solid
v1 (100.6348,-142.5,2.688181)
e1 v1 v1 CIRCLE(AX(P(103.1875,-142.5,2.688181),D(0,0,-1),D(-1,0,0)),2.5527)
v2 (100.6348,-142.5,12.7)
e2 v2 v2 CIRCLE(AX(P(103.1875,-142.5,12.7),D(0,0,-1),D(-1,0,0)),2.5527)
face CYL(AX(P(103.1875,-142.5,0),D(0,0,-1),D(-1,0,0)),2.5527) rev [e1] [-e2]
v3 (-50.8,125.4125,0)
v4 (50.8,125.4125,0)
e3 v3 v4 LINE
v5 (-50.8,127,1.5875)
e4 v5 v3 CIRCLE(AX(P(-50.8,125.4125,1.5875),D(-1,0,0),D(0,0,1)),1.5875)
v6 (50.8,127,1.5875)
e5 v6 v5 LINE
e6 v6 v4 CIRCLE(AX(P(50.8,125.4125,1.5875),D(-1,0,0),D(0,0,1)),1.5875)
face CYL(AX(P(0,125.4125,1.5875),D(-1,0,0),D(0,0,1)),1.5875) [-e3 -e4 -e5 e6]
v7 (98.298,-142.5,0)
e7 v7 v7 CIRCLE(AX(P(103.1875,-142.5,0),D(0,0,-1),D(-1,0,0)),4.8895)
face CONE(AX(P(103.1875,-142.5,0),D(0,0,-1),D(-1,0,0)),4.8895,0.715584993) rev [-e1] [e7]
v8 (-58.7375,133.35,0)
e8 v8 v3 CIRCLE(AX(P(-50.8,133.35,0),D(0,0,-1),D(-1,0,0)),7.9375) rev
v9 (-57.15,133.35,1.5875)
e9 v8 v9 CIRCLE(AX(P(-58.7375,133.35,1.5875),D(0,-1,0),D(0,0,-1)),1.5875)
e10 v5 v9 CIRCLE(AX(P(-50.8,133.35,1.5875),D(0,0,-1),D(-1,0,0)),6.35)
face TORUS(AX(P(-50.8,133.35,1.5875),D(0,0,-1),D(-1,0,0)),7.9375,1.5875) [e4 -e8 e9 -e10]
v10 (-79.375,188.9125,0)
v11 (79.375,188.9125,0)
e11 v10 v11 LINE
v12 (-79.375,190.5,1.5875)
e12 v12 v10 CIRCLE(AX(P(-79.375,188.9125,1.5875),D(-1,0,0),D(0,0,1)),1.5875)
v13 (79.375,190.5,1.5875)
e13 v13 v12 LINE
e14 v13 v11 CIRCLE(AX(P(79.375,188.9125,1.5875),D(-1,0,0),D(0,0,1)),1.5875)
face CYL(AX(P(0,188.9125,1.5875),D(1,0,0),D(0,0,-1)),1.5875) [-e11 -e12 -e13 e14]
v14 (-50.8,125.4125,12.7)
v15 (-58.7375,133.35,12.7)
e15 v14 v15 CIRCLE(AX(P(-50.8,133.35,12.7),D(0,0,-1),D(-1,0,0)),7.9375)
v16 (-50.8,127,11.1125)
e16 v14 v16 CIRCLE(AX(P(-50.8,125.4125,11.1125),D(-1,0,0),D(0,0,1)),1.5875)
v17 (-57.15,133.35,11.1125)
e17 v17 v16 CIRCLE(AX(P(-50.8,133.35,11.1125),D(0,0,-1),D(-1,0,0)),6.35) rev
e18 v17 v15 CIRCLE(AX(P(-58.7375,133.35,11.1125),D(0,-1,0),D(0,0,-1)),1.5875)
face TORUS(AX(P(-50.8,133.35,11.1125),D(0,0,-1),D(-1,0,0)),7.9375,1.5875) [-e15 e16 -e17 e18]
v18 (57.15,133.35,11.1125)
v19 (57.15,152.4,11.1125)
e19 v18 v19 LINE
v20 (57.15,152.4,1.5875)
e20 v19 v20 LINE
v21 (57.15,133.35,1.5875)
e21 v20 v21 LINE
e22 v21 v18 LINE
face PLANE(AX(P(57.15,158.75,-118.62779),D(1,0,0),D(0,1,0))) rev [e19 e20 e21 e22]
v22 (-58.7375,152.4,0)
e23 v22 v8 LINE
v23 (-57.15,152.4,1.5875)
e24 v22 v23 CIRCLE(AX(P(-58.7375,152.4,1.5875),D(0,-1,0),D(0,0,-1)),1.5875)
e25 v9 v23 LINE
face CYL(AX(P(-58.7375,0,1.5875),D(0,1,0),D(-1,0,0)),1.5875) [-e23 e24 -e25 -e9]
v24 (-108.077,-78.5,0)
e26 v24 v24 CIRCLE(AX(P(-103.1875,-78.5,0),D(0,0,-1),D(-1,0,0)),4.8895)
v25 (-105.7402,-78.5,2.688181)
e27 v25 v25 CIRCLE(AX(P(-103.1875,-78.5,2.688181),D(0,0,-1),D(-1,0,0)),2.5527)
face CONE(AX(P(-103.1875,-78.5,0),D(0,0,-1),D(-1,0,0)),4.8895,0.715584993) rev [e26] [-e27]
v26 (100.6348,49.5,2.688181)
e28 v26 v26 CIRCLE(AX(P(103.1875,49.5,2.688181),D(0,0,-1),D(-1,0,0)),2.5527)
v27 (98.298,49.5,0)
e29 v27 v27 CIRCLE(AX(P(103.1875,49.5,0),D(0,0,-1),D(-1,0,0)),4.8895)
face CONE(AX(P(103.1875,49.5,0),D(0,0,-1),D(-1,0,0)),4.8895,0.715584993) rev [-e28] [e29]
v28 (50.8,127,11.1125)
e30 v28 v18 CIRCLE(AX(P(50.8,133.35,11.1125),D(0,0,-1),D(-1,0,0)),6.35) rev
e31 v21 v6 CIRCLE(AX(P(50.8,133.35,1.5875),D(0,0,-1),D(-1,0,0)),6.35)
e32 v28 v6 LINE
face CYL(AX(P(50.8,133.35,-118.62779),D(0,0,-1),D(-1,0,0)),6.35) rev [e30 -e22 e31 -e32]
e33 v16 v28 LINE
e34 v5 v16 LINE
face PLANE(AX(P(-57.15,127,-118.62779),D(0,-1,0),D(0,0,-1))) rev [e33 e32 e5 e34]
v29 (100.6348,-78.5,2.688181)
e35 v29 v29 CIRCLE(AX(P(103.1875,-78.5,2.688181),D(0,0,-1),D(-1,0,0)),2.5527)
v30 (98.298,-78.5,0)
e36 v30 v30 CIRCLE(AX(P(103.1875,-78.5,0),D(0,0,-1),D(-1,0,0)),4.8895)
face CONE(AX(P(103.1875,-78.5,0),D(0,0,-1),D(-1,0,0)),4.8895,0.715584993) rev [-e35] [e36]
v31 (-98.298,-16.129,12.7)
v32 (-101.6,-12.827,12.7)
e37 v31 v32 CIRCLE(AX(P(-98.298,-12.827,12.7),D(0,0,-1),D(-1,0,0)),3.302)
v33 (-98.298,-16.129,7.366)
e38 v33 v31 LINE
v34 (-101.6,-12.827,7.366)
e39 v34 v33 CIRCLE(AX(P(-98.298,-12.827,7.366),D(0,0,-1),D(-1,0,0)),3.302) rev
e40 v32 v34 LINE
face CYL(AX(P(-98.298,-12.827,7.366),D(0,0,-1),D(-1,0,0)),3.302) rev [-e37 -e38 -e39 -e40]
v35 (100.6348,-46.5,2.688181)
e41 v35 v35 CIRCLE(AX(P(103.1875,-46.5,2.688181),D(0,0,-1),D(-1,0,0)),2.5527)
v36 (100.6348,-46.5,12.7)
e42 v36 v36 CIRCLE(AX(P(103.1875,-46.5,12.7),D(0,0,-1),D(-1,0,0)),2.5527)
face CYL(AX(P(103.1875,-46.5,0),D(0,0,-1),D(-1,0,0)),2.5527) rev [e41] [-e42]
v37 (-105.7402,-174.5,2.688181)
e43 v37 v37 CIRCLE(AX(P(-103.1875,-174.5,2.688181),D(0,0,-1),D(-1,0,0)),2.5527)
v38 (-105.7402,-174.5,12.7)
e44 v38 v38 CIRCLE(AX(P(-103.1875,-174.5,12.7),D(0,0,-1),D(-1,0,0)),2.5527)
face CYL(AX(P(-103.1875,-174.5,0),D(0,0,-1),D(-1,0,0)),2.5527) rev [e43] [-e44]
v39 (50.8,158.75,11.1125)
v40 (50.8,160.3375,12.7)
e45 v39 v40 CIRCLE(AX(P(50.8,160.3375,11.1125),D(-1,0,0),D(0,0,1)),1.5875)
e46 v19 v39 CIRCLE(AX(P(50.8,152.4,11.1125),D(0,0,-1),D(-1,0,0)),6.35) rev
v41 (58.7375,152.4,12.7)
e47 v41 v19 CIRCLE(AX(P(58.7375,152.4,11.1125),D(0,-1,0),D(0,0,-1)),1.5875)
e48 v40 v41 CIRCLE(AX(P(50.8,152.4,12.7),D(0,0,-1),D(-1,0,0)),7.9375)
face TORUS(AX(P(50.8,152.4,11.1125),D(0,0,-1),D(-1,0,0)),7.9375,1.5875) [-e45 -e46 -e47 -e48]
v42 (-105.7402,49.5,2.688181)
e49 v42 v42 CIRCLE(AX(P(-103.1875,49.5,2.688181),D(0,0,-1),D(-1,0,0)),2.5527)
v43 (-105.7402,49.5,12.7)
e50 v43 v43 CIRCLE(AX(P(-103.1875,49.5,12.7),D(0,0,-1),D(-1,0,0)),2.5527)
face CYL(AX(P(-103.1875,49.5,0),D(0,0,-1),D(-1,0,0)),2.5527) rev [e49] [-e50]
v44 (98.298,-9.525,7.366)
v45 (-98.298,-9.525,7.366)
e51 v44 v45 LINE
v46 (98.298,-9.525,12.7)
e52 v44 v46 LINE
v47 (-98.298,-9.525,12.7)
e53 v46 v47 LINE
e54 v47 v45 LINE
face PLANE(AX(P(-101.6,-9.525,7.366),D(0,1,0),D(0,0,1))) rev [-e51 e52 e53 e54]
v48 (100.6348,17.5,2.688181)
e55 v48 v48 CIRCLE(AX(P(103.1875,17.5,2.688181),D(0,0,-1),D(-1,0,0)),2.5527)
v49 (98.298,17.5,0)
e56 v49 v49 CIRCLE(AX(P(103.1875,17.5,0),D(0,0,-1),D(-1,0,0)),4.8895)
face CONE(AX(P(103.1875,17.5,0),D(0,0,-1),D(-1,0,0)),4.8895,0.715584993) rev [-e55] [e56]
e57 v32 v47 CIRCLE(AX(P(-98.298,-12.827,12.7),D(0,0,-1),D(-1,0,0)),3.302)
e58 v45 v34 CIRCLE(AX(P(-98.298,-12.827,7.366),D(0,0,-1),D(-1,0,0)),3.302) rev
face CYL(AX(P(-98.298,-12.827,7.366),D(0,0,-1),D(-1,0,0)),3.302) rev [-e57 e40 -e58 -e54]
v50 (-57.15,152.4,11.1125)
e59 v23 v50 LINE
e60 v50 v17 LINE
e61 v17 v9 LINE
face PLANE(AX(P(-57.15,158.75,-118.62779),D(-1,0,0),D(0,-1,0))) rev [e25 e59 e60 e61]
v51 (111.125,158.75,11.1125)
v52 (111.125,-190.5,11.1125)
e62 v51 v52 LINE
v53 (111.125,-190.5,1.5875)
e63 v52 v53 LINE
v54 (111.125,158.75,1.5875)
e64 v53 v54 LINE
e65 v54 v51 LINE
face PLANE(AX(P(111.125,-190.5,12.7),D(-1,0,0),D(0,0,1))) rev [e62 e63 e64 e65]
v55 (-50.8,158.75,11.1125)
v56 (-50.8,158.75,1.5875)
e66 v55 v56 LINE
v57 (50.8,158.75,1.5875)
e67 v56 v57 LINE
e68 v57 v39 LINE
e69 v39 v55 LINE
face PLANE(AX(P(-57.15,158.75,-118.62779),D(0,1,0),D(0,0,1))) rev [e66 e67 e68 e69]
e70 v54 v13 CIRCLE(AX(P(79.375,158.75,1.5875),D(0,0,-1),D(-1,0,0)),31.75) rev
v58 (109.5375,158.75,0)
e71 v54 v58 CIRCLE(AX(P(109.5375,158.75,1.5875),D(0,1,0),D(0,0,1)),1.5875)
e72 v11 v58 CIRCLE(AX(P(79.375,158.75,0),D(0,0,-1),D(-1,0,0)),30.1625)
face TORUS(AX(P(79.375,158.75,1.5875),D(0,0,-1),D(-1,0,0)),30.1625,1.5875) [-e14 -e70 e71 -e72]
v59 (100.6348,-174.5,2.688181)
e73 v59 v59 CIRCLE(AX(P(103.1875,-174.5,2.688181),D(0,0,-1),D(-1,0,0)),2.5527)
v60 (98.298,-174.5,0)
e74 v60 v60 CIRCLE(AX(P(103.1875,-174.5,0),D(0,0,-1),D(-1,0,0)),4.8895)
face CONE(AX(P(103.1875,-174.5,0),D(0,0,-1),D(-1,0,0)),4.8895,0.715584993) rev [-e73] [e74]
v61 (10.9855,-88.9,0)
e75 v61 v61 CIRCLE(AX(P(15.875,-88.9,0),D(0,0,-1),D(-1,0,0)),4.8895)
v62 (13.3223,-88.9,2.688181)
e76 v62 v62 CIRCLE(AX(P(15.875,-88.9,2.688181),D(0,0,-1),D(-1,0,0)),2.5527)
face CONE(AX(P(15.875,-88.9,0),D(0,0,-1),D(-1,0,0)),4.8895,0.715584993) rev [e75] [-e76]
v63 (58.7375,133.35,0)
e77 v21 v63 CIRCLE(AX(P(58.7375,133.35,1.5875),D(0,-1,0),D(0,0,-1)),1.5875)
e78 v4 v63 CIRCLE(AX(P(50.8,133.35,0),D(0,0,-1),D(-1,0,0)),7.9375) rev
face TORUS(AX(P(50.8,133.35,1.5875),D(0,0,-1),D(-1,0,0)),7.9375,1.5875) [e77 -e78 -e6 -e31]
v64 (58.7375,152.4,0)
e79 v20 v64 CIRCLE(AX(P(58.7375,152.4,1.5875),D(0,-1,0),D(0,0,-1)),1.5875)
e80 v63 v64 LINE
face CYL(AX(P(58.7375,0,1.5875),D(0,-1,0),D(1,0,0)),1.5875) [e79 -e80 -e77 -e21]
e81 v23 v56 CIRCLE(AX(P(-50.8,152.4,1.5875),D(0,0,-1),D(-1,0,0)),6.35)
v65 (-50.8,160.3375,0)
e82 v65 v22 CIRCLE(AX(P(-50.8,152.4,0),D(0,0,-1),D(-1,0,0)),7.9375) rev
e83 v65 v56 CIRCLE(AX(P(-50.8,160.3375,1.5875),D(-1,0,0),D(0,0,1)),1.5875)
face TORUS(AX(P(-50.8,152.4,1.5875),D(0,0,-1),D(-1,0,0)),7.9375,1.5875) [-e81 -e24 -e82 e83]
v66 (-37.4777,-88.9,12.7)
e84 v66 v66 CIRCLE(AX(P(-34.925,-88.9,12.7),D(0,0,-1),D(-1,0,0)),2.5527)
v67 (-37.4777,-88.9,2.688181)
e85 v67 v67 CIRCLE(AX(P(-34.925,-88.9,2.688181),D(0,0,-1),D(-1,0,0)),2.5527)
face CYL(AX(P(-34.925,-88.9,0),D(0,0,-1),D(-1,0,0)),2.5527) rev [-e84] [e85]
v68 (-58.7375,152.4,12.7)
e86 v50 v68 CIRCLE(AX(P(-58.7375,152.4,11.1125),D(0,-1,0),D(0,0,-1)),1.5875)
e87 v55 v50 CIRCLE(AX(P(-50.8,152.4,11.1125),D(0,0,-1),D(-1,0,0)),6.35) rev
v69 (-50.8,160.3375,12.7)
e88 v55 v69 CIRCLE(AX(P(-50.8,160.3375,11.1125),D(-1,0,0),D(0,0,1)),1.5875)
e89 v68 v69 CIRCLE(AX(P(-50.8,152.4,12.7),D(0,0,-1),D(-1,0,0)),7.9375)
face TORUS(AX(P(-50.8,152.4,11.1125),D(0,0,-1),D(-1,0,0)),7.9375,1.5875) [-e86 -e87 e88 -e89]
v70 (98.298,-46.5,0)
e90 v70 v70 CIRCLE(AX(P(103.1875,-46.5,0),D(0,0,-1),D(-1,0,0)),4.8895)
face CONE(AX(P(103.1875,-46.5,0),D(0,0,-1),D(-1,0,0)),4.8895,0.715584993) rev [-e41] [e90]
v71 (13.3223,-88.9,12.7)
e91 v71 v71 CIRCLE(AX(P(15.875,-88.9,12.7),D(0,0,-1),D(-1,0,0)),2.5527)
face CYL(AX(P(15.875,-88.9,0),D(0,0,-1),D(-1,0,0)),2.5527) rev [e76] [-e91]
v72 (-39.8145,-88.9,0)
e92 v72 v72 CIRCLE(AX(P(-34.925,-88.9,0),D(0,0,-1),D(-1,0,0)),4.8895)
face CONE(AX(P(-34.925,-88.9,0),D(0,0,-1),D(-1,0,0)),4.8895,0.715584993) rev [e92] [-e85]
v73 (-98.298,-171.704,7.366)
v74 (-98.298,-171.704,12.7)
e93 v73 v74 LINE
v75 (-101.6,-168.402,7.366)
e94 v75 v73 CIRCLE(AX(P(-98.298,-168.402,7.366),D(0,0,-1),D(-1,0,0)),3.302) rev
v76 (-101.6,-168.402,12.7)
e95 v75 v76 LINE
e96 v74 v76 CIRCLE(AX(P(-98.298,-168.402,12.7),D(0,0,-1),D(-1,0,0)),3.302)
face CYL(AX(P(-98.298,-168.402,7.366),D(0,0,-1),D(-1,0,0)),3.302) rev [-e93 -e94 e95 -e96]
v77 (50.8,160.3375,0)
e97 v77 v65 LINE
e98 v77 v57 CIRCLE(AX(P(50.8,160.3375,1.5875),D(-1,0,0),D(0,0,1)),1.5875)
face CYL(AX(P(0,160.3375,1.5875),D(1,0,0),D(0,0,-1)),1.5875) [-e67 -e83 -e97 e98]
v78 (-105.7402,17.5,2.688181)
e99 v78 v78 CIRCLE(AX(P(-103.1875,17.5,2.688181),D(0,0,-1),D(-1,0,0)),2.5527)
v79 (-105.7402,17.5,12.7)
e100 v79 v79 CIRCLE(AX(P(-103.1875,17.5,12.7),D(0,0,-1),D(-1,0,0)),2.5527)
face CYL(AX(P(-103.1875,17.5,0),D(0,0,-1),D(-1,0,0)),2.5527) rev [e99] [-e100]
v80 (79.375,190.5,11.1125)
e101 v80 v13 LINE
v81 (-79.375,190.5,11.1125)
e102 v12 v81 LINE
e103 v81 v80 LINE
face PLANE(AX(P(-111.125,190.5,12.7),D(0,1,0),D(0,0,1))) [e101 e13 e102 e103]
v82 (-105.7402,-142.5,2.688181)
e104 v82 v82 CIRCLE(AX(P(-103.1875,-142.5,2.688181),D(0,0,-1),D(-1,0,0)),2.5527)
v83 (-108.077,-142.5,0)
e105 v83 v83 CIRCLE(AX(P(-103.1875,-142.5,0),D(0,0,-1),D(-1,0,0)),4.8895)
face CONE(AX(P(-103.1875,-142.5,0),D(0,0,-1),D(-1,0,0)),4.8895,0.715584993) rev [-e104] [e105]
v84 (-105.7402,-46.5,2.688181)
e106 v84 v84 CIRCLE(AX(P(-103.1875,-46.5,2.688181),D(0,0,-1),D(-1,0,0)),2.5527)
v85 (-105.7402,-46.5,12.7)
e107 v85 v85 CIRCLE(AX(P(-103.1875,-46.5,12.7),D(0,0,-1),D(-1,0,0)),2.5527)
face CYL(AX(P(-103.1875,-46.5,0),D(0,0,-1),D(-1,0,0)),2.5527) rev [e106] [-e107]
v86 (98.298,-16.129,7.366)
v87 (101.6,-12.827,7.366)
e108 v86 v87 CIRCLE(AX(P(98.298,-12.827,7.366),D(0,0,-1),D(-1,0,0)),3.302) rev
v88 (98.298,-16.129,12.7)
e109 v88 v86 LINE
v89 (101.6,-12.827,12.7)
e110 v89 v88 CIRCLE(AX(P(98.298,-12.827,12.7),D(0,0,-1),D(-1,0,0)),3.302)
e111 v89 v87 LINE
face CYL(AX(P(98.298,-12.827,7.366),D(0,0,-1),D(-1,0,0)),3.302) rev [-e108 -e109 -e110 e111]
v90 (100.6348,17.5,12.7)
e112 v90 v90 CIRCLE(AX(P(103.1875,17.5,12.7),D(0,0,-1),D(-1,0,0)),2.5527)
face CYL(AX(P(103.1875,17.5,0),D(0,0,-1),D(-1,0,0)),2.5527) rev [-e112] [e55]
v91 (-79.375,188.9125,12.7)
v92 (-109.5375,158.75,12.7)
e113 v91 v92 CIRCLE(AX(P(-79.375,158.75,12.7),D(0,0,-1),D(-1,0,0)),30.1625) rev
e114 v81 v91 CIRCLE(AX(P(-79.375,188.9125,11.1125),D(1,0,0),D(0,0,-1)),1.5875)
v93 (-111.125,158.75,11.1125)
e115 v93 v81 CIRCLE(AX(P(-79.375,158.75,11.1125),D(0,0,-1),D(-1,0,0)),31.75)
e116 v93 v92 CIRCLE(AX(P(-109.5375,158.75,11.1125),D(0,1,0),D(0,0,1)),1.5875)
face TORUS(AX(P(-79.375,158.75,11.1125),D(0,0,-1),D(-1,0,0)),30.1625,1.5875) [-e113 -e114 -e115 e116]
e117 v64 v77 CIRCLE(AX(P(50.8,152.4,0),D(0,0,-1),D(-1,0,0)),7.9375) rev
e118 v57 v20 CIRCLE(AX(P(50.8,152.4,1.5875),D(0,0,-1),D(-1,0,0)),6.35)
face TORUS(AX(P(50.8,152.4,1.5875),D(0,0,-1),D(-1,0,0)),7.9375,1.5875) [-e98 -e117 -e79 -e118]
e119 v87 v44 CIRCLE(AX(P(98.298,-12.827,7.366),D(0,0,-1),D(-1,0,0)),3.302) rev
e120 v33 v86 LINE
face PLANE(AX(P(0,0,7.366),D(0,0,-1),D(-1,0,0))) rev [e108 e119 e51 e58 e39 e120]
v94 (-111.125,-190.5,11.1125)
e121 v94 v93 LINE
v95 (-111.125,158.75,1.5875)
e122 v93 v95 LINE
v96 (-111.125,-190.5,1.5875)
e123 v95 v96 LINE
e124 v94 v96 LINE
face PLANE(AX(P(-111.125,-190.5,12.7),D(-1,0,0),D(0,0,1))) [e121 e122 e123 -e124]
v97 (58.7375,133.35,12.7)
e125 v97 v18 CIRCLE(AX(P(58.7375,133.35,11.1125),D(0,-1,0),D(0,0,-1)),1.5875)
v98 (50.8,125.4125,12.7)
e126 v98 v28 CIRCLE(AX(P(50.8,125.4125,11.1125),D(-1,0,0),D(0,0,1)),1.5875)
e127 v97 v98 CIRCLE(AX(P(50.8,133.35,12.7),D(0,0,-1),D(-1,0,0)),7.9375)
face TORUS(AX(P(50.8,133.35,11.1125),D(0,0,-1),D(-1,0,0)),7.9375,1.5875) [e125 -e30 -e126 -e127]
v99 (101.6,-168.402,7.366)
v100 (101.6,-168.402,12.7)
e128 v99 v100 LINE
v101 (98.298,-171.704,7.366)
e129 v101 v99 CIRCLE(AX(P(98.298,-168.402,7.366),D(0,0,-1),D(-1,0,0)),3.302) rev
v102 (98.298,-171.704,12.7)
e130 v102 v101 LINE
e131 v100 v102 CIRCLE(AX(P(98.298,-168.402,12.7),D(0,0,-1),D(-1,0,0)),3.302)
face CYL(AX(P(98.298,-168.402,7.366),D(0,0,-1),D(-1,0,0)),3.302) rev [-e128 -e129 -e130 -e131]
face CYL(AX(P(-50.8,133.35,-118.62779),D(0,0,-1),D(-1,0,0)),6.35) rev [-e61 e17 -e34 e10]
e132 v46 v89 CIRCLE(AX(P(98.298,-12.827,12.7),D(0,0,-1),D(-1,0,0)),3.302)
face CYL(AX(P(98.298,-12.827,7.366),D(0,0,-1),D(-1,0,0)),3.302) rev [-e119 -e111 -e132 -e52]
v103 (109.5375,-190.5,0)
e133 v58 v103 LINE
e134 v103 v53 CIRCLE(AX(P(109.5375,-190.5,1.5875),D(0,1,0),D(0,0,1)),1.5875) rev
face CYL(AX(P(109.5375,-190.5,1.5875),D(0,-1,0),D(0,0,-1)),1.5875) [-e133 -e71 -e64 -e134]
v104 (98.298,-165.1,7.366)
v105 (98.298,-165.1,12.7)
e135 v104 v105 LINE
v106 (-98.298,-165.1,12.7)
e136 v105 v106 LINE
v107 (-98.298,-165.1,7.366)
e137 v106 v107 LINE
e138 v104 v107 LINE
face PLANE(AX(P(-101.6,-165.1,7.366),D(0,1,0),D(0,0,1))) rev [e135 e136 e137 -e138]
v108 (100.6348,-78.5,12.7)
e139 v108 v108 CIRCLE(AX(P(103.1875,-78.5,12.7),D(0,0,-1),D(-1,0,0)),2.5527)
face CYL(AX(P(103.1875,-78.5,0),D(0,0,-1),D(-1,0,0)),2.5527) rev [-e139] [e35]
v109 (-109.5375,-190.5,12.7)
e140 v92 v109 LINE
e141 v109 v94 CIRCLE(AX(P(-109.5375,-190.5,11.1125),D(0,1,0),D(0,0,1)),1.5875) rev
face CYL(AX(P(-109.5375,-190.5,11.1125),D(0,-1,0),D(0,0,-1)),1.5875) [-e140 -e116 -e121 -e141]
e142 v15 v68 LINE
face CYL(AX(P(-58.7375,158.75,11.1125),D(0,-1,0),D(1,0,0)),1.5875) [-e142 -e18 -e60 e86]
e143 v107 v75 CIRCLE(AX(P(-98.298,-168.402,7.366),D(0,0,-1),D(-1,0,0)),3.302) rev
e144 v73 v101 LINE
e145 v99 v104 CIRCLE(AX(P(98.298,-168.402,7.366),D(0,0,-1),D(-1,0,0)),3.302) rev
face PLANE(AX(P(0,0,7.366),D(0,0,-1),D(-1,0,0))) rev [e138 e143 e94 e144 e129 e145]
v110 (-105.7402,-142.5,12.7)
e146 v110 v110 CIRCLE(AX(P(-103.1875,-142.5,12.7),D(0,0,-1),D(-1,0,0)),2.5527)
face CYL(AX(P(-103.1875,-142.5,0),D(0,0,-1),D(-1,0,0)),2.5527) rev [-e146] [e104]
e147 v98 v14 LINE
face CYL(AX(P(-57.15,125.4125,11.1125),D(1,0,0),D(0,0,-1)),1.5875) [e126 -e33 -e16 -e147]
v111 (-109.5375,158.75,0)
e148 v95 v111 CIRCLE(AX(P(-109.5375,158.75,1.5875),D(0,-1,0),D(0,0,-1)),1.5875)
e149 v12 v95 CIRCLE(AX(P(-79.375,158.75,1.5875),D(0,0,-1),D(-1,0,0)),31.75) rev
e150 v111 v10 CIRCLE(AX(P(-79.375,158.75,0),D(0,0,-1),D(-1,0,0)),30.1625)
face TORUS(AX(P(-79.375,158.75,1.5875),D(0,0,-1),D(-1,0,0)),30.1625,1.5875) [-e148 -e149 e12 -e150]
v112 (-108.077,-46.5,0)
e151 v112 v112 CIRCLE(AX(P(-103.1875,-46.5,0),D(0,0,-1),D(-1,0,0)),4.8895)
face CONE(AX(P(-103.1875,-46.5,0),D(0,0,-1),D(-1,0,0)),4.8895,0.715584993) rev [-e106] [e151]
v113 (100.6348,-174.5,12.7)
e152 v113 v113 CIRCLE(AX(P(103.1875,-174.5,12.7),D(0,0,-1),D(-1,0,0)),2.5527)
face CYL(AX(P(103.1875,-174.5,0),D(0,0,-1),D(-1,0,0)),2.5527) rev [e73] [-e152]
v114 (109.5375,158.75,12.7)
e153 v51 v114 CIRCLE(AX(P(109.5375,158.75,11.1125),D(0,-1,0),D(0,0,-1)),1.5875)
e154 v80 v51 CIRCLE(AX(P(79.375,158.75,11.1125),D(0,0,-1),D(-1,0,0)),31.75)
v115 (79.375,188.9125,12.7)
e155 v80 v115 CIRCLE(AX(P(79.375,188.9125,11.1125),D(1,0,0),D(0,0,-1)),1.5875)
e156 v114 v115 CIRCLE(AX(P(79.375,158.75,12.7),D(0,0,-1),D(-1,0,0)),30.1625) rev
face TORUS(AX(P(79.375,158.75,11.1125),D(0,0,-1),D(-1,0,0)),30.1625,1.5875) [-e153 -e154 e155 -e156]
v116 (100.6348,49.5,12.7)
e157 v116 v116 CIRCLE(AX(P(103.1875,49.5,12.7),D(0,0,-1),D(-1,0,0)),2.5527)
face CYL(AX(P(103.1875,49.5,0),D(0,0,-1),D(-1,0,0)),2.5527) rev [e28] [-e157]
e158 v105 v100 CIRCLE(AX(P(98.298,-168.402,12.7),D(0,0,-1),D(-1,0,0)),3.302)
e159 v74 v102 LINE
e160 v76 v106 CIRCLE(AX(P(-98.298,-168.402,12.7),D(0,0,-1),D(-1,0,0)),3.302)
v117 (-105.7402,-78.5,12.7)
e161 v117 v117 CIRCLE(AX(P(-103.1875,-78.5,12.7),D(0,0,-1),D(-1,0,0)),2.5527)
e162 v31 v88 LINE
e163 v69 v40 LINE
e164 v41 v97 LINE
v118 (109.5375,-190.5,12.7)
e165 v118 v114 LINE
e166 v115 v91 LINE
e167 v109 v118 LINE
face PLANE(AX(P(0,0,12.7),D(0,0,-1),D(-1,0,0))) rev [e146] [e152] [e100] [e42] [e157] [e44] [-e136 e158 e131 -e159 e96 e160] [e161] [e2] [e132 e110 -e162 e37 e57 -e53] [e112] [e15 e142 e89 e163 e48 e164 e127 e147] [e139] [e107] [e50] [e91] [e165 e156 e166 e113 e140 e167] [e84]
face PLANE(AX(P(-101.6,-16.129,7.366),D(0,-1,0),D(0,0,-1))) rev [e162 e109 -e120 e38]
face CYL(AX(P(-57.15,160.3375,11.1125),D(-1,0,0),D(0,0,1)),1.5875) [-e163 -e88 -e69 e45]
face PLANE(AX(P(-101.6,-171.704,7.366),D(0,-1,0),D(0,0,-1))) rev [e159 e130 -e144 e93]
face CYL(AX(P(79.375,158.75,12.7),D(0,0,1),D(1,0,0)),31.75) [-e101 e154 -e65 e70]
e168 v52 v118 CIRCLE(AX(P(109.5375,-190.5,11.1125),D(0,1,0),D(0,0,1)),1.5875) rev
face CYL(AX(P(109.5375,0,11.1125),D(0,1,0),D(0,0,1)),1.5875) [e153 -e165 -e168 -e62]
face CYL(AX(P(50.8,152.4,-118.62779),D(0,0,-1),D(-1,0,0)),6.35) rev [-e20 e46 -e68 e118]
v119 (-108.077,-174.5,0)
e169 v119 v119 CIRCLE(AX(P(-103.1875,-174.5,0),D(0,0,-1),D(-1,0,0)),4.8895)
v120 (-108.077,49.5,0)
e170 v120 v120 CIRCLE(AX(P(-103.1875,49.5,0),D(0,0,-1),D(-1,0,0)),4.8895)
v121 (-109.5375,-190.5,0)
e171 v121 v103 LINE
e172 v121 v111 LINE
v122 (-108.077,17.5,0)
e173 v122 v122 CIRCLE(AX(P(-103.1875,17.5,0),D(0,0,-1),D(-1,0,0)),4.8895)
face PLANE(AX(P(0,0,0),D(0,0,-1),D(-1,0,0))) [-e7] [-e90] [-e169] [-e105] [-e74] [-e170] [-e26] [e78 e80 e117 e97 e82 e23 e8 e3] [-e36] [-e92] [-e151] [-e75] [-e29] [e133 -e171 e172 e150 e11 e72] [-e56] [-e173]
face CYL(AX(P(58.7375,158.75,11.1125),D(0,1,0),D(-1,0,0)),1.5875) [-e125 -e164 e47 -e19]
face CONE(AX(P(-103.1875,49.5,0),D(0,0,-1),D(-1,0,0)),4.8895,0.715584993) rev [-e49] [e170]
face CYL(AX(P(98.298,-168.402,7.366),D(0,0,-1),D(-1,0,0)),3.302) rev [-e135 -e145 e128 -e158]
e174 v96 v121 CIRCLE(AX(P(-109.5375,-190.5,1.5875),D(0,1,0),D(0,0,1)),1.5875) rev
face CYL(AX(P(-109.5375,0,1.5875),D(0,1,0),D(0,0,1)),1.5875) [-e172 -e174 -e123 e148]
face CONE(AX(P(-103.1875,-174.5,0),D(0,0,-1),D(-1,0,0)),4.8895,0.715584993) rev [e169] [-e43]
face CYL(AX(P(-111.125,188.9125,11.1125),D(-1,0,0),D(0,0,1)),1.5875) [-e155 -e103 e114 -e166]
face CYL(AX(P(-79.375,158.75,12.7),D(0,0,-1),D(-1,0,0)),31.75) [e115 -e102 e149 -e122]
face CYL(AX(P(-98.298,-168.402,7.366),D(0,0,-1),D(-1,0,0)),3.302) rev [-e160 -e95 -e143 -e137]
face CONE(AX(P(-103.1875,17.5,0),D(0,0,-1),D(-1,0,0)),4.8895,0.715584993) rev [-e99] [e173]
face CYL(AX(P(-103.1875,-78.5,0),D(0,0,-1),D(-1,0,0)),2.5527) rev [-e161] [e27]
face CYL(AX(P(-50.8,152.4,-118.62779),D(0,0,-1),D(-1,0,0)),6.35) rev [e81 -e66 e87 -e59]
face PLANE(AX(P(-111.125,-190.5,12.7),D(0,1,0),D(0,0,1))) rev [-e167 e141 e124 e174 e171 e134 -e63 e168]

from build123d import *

# Parameters (mm, degrees)
SKETCH1_W                                       = 222.25
SKETCH1_H                                       = 381
BOSS_EXTRUDE1_DEPTH                             = 12.7
FILLET1_R                                       = 31.75
SKETCH2_W                                       = 114.3
SKETCH2_H                                       = 31.75
CUT_EXTRUDE1_DEPTH                              = 12.7
FILLET2_R                                       = 6.35
SKETCH3_W                                       = 203.2
SKETCH3_H                                       = 6.604
CUT_EXTRUDE2_DEPTH                              = 5.334
FILLET3_R                                       = 3.302
CSK_FOR_10_FLAT_HEAD_MACHINE_SCREW1_D           = 5.1054
CSK_FOR_10_FLAT_HEAD_MACHINE_SCREW1_CSINK_D     = 9.779
CSK_FOR_10_FLAT_HEAD_MACHINE_SCREW1_CSINK_ANGLE = 82
FILLET4_R                                       = 1.5875


with BuildPart() as part:
    # Sketch1 → Boss-Extrude1 (new body)
    with BuildSketch(Plane.XY):
        Rectangle(SKETCH1_W, SKETCH1_H)
    extrude(amount=BOSS_EXTRUDE1_DEPTH)

    # Fillet1
    fillet1_edges = [part.edges().sort_by_distance(p)[0] for p in [
        (111.125, 190.5, 6.35),
        (-111.125, 190.5, 6.35),
    ]]
    fillet(fillet1_edges, radius=FILLET1_R)

    # Sketch2 → Cut-Extrude1 (cut)
    with BuildSketch(Plane.XY.offset(12.7)):
        with Locations((0, 142.875)):
            Rectangle(SKETCH2_W, SKETCH2_H)
    extrude(amount=-CUT_EXTRUDE1_DEPTH, mode=Mode.SUBTRACT)

    # Fillet2
    fillet2_edges = [part.edges().sort_by_distance(p)[0] for p in [
        (57.15, 127, 6.35),
        (57.15, 158.75, 6.35),
        (-57.15, 158.75, 6.35),
        (-57.15, 127, 6.35),
    ]]
    fillet(fillet2_edges, radius=FILLET2_R)

    # Sketch3 → Cut-Extrude2 (cut)
    with BuildSketch(Plane.XY.offset(12.7)):
        with Locations((0, -168.402)):
            Rectangle(SKETCH3_W, SKETCH3_H)
        with Locations((0, -12.827)):
            Rectangle(SKETCH3_W, SKETCH3_H)
    extrude(amount=-CUT_EXTRUDE2_DEPTH, mode=Mode.SUBTRACT)

    # Fillet3
    fillet3_edges = [part.edges().sort_by_distance(p)[0] for p in [
        (101.6, -165.1, 10.033),
        (101.6, -171.704, 10.033),
        (-101.6, -171.704, 10.033),
        (-101.6, -165.1, 10.033),
        (101.6, -16.129, 10.033),
        (101.6, -9.525, 10.033),
        (-101.6, -9.525, 10.033),
        (-101.6, -16.129, 10.033),
    ]]
    fillet(fillet3_edges, radius=FILLET3_R - 0.0001)  # a hair under: the kernel refuses the full size

    # CSK for #10 Flat Head Machine Screw1 (through all)
    with Locations(Plane(origin=(0, 0, 0), x_dir=(-1, 0, 0), z_dir=(0, 0, -1))):
        with Locations((-103.1875, -174.499999996), (103.1875, -174.499999996), (-15.875, -88.9), (34.925, -88.9), (-103.1875, -142.499999988), (103.1875, -142.499999988), (-103.1875, -78.499999972), (103.1875, -78.499999972), (-103.1875, -46.499999964), (103.1875, -46.499999964), (-103.1875, 17.500000052), (103.1875, 17.500000052), (-103.1875, 49.50000006), (103.1875, 49.50000006)):
            CounterSinkHole(CSK_FOR_10_FLAT_HEAD_MACHINE_SCREW1_D / 2, CSK_FOR_10_FLAT_HEAD_MACHINE_SCREW1_CSINK_D / 2, counter_sink_angle=CSK_FOR_10_FLAT_HEAD_MACHINE_SCREW1_CSINK_ANGLE)

    # Fillet4
    fillet4_edges = [part.edges().sort_by_distance(p)[0] for p in [
        (111.125, -15.875, 12.7),
        (0, 190.5, 0),
        (101.825640303, 181.200640303, 0),
        (-101.825640303, 181.200640303, 0),
        (0, 190.5, 12.7),
        (101.825640303, 181.200640303, 12.7),
        (-101.825640303, 181.200640303, 12.7),
        (-111.125, -15.875, 12.7),
        (57.15, 142.875, 12.7),
        (57.15, 142.875, 0),
        (0, 127, 12.7),
        (0, 127, 0),
        (0, 158.75, 12.7),
        (0, 158.75, 0),
        (-57.15, 142.875, 12.7),
        (-57.15, 142.875, 0),
        (111.125, -15.875, 0),
        (55.290128061, 128.859871939, 12.7),
        (55.290128061, 128.859871939, 0),
        (55.290128061, 156.890128061, 12.7),
        (55.290128061, 156.890128061, 0),
        (-55.290128061, 156.890128061, 12.7),
        (-55.290128061, 156.890128061, 0),
        (-55.290128061, 128.859871939, 12.7),
        (-55.290128061, 128.859871939, 0),
        (-111.125, -15.875, 0),
    ]]
    fillet(fillet4_edges, radius=FILLET4_R)


solid = part.part
